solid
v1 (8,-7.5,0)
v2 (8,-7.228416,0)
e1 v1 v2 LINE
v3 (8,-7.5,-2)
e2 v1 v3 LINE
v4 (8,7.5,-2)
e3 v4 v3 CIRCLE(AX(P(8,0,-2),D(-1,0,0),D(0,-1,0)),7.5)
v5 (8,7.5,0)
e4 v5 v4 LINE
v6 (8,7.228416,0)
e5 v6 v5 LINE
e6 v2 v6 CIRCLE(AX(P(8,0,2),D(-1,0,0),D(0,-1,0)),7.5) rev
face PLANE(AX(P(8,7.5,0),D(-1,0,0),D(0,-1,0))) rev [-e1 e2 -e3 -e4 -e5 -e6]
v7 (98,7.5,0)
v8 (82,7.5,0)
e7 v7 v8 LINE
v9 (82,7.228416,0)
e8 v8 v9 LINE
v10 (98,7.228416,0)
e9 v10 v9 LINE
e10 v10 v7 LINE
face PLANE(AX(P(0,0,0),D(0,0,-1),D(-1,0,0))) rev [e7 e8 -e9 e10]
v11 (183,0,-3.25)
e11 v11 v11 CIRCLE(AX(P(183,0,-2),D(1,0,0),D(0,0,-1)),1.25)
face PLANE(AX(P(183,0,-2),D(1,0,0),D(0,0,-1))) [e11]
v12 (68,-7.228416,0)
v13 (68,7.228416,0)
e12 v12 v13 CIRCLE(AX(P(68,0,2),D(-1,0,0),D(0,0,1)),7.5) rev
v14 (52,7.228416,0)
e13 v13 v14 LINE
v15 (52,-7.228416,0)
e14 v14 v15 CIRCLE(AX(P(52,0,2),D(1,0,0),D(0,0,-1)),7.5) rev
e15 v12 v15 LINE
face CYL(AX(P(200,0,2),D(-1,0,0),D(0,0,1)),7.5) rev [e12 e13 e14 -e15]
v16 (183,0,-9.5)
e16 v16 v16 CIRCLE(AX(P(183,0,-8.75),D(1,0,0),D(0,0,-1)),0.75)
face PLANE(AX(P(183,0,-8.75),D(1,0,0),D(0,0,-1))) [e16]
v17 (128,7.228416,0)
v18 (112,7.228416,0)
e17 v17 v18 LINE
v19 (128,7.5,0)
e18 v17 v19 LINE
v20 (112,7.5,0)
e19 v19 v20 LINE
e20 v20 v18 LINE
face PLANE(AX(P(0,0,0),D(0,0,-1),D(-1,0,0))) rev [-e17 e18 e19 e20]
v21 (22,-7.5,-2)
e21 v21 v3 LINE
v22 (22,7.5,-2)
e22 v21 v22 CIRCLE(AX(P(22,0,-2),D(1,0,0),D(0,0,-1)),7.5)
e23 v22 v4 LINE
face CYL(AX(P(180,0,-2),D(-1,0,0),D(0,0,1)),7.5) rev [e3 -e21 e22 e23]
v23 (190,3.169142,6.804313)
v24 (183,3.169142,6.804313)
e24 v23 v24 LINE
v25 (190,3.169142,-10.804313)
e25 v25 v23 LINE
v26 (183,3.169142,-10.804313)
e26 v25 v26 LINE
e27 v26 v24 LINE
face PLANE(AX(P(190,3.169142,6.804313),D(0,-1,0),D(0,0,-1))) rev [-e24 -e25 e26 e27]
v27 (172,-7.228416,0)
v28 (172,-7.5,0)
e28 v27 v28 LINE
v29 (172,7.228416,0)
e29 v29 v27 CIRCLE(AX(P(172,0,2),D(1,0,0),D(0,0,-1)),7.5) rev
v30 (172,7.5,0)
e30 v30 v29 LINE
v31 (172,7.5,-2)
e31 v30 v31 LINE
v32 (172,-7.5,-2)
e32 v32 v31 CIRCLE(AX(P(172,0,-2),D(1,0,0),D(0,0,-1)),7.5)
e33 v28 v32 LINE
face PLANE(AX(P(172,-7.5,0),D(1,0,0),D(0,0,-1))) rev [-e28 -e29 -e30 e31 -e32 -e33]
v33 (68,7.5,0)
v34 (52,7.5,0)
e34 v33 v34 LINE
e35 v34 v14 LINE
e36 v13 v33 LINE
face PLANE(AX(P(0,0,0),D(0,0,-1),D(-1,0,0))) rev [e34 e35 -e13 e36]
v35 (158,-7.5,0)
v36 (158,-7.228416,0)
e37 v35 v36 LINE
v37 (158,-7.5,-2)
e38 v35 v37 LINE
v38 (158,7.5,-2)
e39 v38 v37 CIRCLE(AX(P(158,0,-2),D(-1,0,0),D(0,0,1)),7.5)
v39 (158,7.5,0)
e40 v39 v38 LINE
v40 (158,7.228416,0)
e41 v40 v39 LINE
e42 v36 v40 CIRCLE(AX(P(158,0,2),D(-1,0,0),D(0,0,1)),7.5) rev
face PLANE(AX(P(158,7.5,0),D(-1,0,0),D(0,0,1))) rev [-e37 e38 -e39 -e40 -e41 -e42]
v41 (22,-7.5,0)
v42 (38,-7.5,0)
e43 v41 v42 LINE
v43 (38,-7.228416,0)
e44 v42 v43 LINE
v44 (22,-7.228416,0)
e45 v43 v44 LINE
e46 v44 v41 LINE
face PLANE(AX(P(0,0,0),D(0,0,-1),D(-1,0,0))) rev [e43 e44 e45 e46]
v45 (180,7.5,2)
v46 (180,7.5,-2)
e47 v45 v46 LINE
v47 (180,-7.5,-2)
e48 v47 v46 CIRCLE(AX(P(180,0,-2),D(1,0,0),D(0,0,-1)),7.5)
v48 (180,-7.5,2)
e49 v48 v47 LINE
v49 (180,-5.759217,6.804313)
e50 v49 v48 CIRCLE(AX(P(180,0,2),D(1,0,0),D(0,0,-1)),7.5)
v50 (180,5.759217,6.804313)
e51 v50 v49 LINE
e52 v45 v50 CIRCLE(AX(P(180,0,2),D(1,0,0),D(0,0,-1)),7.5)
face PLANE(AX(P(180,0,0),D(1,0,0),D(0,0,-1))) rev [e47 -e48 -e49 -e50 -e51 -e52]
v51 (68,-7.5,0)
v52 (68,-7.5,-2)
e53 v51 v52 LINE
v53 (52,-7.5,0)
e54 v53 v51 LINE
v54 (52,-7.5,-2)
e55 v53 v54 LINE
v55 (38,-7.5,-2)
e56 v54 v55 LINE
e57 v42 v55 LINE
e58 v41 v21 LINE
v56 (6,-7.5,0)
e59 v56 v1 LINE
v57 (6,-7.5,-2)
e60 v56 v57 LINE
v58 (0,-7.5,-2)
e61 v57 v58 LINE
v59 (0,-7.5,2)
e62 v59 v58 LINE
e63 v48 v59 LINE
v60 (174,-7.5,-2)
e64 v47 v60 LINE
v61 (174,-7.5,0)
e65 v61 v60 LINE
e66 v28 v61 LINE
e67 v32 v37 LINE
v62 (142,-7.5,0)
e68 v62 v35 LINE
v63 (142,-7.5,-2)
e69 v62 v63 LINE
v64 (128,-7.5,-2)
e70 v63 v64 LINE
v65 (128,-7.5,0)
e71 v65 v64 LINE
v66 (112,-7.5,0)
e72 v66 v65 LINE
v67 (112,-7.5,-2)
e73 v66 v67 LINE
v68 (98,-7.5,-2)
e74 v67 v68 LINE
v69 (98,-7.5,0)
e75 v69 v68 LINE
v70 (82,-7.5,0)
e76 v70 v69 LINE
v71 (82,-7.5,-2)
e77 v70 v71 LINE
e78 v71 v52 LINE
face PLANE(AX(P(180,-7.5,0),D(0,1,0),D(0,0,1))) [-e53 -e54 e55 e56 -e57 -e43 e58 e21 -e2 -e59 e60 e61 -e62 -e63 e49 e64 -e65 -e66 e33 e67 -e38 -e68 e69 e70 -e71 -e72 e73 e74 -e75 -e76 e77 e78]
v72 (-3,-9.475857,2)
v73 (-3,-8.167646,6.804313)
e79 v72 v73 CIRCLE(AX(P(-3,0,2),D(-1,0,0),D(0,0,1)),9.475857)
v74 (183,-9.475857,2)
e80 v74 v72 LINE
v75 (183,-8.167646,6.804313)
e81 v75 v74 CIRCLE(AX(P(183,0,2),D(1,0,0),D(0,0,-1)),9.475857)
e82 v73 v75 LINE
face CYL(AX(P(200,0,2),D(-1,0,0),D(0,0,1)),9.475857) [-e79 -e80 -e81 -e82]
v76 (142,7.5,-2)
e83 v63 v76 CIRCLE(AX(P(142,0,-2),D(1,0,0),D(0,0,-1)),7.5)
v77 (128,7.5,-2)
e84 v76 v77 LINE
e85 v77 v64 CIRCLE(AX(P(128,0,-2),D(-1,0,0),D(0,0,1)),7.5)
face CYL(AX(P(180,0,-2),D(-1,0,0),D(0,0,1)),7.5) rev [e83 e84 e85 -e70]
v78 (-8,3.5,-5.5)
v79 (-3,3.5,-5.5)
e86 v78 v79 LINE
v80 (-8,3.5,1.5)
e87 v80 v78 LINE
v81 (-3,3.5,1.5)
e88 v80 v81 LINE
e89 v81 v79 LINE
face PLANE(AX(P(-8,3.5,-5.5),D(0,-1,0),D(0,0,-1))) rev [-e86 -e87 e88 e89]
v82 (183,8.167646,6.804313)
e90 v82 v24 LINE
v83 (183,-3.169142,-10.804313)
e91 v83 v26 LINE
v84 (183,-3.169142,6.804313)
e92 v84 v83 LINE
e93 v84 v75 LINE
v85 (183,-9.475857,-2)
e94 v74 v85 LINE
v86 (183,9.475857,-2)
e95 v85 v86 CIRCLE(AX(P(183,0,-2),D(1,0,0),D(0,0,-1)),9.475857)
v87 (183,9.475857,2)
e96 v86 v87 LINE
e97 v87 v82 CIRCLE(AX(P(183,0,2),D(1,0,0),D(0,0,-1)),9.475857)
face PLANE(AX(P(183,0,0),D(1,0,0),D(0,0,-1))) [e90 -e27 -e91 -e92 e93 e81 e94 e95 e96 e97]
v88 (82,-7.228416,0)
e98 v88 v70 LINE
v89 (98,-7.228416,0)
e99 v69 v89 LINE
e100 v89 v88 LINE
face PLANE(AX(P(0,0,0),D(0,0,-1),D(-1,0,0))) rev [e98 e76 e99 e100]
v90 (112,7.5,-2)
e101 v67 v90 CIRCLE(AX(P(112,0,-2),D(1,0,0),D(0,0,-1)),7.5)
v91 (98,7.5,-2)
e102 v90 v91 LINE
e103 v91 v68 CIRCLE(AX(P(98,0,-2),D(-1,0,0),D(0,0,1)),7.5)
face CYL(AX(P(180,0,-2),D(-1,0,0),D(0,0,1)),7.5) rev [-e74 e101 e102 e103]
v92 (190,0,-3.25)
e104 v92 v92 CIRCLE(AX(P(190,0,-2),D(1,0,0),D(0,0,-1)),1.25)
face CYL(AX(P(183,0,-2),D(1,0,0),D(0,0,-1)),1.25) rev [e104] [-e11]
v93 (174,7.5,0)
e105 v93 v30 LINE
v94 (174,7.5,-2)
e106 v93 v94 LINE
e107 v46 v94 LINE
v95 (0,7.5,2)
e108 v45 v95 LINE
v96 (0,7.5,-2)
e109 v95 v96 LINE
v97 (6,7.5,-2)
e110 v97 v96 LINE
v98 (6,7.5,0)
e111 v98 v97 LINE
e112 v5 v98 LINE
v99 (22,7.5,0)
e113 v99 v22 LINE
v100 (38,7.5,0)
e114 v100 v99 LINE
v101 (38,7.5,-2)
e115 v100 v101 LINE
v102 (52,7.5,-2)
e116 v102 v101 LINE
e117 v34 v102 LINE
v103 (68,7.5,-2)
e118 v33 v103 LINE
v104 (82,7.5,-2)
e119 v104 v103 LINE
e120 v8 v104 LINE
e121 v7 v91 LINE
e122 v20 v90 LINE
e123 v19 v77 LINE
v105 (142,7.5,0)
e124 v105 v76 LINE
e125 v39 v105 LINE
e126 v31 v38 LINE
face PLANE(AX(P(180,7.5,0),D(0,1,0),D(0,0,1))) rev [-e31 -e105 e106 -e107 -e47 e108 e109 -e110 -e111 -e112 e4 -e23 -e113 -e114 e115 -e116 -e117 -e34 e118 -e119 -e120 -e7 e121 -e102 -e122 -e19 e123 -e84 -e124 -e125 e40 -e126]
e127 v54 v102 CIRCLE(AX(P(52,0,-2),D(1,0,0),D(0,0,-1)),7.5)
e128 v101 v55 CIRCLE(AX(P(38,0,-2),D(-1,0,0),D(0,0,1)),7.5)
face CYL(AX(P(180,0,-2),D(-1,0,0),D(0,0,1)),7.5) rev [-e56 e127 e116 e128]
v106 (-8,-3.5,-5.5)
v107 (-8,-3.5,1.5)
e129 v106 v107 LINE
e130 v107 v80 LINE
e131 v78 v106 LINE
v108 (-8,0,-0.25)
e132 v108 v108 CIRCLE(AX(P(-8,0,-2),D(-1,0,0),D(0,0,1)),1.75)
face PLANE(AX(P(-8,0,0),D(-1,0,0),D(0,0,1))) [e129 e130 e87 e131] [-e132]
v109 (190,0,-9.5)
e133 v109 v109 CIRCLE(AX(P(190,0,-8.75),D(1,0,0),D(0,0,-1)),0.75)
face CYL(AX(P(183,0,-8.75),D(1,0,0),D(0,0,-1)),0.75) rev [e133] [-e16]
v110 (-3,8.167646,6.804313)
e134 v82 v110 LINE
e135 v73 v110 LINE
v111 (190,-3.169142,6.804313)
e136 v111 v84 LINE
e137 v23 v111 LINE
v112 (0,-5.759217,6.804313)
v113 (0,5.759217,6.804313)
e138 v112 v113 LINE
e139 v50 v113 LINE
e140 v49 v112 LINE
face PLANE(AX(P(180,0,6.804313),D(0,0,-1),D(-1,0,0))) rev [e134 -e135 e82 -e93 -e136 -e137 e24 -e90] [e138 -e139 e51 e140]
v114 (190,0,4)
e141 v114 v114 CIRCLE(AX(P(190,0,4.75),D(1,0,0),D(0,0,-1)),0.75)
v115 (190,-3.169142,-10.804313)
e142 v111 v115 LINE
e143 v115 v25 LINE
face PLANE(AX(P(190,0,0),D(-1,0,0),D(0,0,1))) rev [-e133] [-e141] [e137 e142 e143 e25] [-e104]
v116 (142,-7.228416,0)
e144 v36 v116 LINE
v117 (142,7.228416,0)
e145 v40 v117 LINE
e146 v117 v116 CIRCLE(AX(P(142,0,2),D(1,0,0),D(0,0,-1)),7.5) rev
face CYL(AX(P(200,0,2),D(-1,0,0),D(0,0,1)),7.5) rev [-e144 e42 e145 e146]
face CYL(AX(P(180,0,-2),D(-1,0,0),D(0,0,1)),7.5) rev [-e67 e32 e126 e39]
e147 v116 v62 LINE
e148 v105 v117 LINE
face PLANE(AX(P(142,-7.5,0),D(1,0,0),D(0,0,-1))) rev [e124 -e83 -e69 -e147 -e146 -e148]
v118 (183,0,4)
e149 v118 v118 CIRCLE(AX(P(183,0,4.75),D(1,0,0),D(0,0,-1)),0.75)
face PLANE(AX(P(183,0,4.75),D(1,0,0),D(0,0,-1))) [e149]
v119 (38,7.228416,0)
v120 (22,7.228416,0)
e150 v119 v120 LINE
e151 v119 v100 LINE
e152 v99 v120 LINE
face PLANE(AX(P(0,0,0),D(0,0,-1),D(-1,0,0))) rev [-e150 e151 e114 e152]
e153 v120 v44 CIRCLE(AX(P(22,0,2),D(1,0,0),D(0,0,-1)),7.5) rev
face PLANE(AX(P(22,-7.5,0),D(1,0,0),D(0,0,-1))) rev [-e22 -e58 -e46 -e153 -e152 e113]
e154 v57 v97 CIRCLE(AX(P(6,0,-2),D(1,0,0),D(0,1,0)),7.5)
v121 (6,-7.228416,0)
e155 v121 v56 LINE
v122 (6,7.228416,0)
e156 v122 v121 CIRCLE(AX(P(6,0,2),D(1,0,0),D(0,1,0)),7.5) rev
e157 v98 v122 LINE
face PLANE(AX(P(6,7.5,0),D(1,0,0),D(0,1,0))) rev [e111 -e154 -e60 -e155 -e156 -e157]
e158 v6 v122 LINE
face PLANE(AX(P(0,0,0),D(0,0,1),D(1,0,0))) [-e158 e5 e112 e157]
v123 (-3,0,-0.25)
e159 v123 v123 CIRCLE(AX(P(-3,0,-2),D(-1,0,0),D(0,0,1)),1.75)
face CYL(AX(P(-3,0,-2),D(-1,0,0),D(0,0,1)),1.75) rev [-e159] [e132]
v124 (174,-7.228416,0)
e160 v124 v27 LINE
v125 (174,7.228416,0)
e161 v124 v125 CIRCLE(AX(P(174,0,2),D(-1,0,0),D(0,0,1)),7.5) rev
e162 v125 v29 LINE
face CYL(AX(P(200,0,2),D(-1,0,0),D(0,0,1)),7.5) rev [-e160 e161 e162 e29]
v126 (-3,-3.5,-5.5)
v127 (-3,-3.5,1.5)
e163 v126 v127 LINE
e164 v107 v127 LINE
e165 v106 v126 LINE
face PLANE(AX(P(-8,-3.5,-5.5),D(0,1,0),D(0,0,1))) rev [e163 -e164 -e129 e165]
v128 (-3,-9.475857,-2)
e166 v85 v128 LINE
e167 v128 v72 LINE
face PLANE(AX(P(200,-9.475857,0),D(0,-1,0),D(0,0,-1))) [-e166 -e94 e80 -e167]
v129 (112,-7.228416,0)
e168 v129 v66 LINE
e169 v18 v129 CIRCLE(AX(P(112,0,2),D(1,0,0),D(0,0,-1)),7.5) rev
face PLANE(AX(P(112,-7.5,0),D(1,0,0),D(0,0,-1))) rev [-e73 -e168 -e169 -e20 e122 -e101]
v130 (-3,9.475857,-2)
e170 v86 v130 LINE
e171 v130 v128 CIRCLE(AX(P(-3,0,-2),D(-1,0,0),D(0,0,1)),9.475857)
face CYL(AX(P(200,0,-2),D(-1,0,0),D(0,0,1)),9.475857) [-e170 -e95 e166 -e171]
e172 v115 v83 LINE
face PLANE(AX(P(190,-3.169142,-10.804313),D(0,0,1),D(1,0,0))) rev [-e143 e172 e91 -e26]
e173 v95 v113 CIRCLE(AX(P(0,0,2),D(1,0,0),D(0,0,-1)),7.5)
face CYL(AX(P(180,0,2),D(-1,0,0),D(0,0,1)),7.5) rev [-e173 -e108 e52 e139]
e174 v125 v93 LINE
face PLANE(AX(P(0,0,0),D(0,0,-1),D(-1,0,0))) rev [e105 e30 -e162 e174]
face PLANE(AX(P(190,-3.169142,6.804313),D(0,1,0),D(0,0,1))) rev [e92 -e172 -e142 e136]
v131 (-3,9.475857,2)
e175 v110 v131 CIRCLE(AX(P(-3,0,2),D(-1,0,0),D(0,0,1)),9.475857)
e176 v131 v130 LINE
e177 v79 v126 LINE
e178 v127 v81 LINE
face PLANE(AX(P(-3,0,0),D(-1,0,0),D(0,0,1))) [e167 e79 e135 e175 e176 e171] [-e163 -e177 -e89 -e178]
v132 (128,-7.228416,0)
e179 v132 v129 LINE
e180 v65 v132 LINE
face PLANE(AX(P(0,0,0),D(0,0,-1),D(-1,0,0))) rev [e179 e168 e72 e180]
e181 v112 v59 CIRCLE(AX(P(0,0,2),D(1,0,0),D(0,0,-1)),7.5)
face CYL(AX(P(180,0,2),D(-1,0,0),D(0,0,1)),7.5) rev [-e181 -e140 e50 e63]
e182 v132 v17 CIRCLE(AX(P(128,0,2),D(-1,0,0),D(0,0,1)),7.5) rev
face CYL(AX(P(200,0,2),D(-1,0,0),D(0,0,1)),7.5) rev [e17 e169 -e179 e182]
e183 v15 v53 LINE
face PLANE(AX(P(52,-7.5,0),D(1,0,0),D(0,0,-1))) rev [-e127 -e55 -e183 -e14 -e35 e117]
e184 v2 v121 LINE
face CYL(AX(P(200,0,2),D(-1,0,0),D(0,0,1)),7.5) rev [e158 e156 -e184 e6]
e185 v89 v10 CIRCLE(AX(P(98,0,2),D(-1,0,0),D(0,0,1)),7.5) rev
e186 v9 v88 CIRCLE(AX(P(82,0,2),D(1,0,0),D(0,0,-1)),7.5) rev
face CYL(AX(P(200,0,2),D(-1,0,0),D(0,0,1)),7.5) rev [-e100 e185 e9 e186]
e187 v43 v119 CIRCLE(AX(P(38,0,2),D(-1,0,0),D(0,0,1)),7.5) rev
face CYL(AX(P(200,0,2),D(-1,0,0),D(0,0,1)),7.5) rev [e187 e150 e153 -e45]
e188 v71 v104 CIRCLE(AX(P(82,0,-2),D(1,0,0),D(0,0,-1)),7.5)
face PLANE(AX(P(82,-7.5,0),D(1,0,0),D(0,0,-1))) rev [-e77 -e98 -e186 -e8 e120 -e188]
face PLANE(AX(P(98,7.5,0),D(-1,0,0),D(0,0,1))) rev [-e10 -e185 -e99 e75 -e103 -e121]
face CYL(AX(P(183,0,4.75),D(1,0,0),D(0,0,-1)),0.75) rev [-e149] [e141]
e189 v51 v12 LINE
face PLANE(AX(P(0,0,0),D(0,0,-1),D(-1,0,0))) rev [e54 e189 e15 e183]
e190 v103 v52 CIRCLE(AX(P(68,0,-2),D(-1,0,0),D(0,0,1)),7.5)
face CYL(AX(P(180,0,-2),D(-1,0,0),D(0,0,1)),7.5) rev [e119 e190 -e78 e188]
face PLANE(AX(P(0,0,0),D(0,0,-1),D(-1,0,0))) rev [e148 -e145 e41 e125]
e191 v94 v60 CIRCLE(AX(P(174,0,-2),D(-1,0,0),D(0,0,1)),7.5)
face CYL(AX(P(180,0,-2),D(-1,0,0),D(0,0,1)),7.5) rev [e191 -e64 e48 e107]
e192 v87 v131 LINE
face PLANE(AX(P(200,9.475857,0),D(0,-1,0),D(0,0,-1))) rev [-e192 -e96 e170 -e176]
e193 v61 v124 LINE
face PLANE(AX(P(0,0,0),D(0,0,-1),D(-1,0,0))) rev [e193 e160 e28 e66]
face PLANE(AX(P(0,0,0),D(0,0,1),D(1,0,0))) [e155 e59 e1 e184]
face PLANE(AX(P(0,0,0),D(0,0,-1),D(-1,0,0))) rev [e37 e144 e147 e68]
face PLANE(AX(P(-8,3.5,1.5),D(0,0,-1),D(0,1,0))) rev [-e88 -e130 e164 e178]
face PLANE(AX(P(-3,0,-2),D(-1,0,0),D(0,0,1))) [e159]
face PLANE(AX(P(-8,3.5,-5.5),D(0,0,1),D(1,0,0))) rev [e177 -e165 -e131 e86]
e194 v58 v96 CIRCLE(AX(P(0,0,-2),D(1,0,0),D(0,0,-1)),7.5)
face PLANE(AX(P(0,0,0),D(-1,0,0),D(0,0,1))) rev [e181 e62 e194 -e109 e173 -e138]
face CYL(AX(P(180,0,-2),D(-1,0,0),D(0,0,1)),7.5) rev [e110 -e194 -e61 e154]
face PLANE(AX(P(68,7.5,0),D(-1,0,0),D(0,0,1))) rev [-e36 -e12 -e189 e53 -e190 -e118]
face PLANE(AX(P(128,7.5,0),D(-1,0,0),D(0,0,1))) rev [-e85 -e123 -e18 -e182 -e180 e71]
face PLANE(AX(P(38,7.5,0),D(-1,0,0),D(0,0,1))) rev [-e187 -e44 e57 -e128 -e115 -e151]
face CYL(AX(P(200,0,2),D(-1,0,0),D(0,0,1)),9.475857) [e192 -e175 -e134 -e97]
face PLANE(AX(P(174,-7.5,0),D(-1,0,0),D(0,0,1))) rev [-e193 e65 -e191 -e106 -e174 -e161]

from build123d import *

# Parameters (mm, degrees)
AUFSATZ_LINEAR_AUSTRAGEN1_DEPTH = 180
AUFSATZ_LINEAR_START            = -10
SKIZZE3_W                       = 2
SKIZZE3_H                       = 15
AUFSATZ_LINEAR_AUSTRAGEN2_DEPTH = 10
SKIZZE11_W                      = 12
SKIZZE11_H                      = 15
AUFSATZ_LINEAR_AUSTRAGEN6_DEPTH = 10
SCHNITT_LINEAR_AUSTRAGEN3_DEPTH = 200
AUFSATZ_LINEAR_AUSTRAGEN3_DEPTH = 3
SKIZZE9_W                       = 17.608625436
SKIZZE9_H                       = 6.338284118
AUFSATZ_LINEAR_AUSTRAGEN5_DEPTH = 7
SKIZZE10_R                      = 0.75
SKIZZE10_R_2                    = 1.25
SCHNITT_LINEAR_AUSTRAGEN5_DEPTH = 7
AUFSATZ_LINEAR_START_2          = 3
AUFSATZ_LINEAR_AUSTRAGEN7_DEPTH = 3
SKIZZE13_W                      = 7
SKIZZE13_H                      = 7
AUFSATZ_LINEAR_AUSTRAGEN8_DEPTH = 5
SKIZZE15_R                      = 1.75
SCHNITT_LINEAR_AUSTRAGEN6_DEPTH = 5


with BuildPart() as part:
    # Skizze2 → Aufsatz-Linear austragen1 (new body)
    with BuildSketch(Plane(origin=(0, 0, 0), x_dir=(0, 0, -1), z_dir=(1, 0, 0))):
        with BuildLine():
            ThreePointArc((-6.804312718, 5.759216901), (-4.554982705, 7.051387337), (-2, 7.5))
            Line((-2, 7.5), (2, 7.5))
            ThreePointArc((2, 7.5), (9.5, 0), (2, -7.5))
            Line((2, -7.5), (-2, -7.5))
            ThreePointArc((-2, -7.5), (-4.554982705, -7.051387337), (-6.804312718, -5.759216901))
            Line((-6.804312718, -5.759216901), (-6.804312718, -8.195643923))
            ThreePointArc((-6.804312718, -8.195643923), (-4.489114575, -9.16811369), (-2, -9.5))
            Line((-2, -9.5), (2, -9.5))
            ThreePointArc((2, -9.5), (11.5, 0), (2, 9.5))
            Line((2, 9.5), (-2, 9.5))
            ThreePointArc((-2, 9.5), (-4.489114575, 9.16811369), (-6.804312718, 8.195643923))
            Line((-6.804312718, 8.195643923), (-6.804312718, 5.759216901))
        make_face()
    extrude(amount=AUFSATZ_LINEAR_AUSTRAGEN1_DEPTH)

    # Skizze3 → Aufsatz-Linear austragen2 (add)
    with BuildSketch(Plane.XY.offset(AUFSATZ_LINEAR_START)):
        with Locations((37, 0)):
            Rectangle(SKIZZE3_W, SKIZZE3_H)
        with Locations((7, 0)):
            Rectangle(SKIZZE3_W, SKIZZE3_H)
        with Locations((23, 0)):
            Rectangle(SKIZZE3_W, SKIZZE3_H)
        with Locations((53, 0)):
            Rectangle(SKIZZE3_W, SKIZZE3_H)
        with Locations((67, 0)):
            Rectangle(SKIZZE3_W, SKIZZE3_H)
        with Locations((83, 0)):
            Rectangle(SKIZZE3_W, SKIZZE3_H)
        with Locations((97, 0)):
            Rectangle(SKIZZE3_W, SKIZZE3_H)
        with Locations((113, 0)):
            Rectangle(SKIZZE3_W, SKIZZE3_H)
        with Locations((127, 0)):
            Rectangle(SKIZZE3_W, SKIZZE3_H)
        with Locations((143, 0)):
            Rectangle(SKIZZE3_W, SKIZZE3_H)
        with Locations((157, 0)):
            Rectangle(SKIZZE3_W, SKIZZE3_H)
        with Locations((173, 0)):
            Rectangle(SKIZZE3_W, SKIZZE3_H)
    extrude(amount=AUFSATZ_LINEAR_AUSTRAGEN2_DEPTH)

    # Skizze11 → Aufsatz-Linear austragen6 (add)
    with BuildSketch(Plane.XY.offset(AUFSATZ_LINEAR_START)):
        with Locations((30, 0)):
            Rectangle(SKIZZE11_W, SKIZZE11_H)
        with Locations((60, 0)):
            Rectangle(SKIZZE11_W, SKIZZE11_H)
        with Locations((90, 0)):
            Rectangle(SKIZZE11_W, SKIZZE11_H)
        with Locations((120, 0)):
            Rectangle(SKIZZE11_W, SKIZZE11_H)
        with Locations((150, 0)):
            Rectangle(SKIZZE11_W, SKIZZE11_H)
    extrude(amount=AUFSATZ_LINEAR_AUSTRAGEN6_DEPTH)

    # Skizze5 → Schnitt-Linear austragen3 (cut)
    with BuildSketch(Plane(origin=(0, 0, 0), x_dir=(0, 0, -1), z_dir=(1, 0, 0))):
        with BuildLine():
            ThreePointArc((0, -7.228416147), (5.5, 0), (0, 7.228416147))
            Line((0, 7.228416147), (0, -7.228416147))
        make_face()
        with BuildLine():
            ThreePointArc((2, 9.47585653), (11.47585653, 0), (2, -9.47585653))
            Line((2, -9.47585653), (-2, -9.47585653))
            ThreePointArc((-2, -9.47585653), (-5.40264982, -8.843858388), (-8.35141595, -7.032166979))
            ThreePointArc((-8.35141595, -7.032166979), (14.514119409, 0), (-8.35141595, 7.032166979))
            ThreePointArc((-8.35141595, 7.032166979), (-5.40264982, 8.843858388), (-2, 9.47585653))
            Line((-2, 9.47585653), (2, 9.47585653))
        make_face()
    extrude(amount=SCHNITT_LINEAR_AUSTRAGEN3_DEPTH, mode=Mode.SUBTRACT)

    # Skizze6 → Aufsatz-Linear austragen3 (add)
    with BuildSketch(Plane(origin=(180, 0, 0), x_dir=(0, 0, -1), z_dir=(1, 0, 0))):
        with BuildLine():
            ThreePointArc((-2, 9.47585653), (-4.489620265, 9.142956192), (-6.804312718, 8.167645701))
            Line((-6.804312718, 8.167645701), (-6.804312718, -8.167645701))
            ThreePointArc((-6.804312718, -8.167645701), (-4.489620265, -9.142956192), (-2, -9.47585653))
            Line((-2, -9.47585653), (2, -9.47585653))
            ThreePointArc((2, -9.47585653), (11.47585653, 0), (2, 9.47585653))
            Line((2, 9.47585653), (-2, 9.47585653))
        make_face()
    extrude(amount=AUFSATZ_LINEAR_AUSTRAGEN3_DEPTH)

    # Skizze9 → Aufsatz-Linear austragen5 (add)
    with BuildSketch(Plane(origin=(183, 0, 0), x_dir=(0, 0, -1), z_dir=(1, 0, 0))):
        with Locations((2, 0)):
            Rectangle(SKIZZE9_W, SKIZZE9_H)
    extrude(amount=AUFSATZ_LINEAR_AUSTRAGEN5_DEPTH)

    # Skizze10 → Schnitt-Linear austragen5 (cut)
    with BuildSketch(Plane(origin=(190, 0, 0), x_dir=(0, 0, -1), z_dir=(1, 0, 0))):
        with Locations((-4.75, 0)):
            Circle(SKIZZE10_R)
        with Locations((8.75, 0)):
            Circle(SKIZZE10_R)
        with Locations((2, 0)):
            Circle(SKIZZE10_R_2)
    extrude(amount=-SCHNITT_LINEAR_AUSTRAGEN5_DEPTH, mode=Mode.SUBTRACT)

    # Skizze12 → Aufsatz-Linear austragen7 (add)
    with BuildSketch(Plane.ZY.offset(AUFSATZ_LINEAR_START_2)):
        with BuildLine():
            ThreePointArc((6.804312718, 8.167645701), (4.489620265, 9.142956192), (2, 9.47585653))
            Line((2, 9.47585653), (-2, 9.47585653))
            ThreePointArc((-2, 9.47585653), (-11.47585653, 0), (-2, -9.47585653))
            Line((-2, -9.47585653), (2, -9.47585653))
            ThreePointArc((2, -9.47585653), (4.489620265, -9.142956192), (6.804312718, -8.167645701))
            Line((6.804312718, -8.167645701), (6.804312718, 8.167645701))
        make_face()
    extrude(amount=-AUFSATZ_LINEAR_AUSTRAGEN7_DEPTH)

    # Skizze13 → Aufsatz-Linear austragen8 (add)
    with BuildSketch(Plane.ZY.offset(3)):
        with Locations((-2, 0)):
            Rectangle(SKIZZE13_W, SKIZZE13_H)
    extrude(amount=AUFSATZ_LINEAR_AUSTRAGEN8_DEPTH)

    # Skizze15 → Schnitt-Linear austragen6 (cut)
    with BuildSketch(Plane.ZY.offset(8)):
        with Locations((-2, 0)):
            Circle(SKIZZE15_R)
    extrude(amount=-SCHNITT_LINEAR_AUSTRAGEN6_DEPTH, mode=Mode.SUBTRACT)


solid = part.part
